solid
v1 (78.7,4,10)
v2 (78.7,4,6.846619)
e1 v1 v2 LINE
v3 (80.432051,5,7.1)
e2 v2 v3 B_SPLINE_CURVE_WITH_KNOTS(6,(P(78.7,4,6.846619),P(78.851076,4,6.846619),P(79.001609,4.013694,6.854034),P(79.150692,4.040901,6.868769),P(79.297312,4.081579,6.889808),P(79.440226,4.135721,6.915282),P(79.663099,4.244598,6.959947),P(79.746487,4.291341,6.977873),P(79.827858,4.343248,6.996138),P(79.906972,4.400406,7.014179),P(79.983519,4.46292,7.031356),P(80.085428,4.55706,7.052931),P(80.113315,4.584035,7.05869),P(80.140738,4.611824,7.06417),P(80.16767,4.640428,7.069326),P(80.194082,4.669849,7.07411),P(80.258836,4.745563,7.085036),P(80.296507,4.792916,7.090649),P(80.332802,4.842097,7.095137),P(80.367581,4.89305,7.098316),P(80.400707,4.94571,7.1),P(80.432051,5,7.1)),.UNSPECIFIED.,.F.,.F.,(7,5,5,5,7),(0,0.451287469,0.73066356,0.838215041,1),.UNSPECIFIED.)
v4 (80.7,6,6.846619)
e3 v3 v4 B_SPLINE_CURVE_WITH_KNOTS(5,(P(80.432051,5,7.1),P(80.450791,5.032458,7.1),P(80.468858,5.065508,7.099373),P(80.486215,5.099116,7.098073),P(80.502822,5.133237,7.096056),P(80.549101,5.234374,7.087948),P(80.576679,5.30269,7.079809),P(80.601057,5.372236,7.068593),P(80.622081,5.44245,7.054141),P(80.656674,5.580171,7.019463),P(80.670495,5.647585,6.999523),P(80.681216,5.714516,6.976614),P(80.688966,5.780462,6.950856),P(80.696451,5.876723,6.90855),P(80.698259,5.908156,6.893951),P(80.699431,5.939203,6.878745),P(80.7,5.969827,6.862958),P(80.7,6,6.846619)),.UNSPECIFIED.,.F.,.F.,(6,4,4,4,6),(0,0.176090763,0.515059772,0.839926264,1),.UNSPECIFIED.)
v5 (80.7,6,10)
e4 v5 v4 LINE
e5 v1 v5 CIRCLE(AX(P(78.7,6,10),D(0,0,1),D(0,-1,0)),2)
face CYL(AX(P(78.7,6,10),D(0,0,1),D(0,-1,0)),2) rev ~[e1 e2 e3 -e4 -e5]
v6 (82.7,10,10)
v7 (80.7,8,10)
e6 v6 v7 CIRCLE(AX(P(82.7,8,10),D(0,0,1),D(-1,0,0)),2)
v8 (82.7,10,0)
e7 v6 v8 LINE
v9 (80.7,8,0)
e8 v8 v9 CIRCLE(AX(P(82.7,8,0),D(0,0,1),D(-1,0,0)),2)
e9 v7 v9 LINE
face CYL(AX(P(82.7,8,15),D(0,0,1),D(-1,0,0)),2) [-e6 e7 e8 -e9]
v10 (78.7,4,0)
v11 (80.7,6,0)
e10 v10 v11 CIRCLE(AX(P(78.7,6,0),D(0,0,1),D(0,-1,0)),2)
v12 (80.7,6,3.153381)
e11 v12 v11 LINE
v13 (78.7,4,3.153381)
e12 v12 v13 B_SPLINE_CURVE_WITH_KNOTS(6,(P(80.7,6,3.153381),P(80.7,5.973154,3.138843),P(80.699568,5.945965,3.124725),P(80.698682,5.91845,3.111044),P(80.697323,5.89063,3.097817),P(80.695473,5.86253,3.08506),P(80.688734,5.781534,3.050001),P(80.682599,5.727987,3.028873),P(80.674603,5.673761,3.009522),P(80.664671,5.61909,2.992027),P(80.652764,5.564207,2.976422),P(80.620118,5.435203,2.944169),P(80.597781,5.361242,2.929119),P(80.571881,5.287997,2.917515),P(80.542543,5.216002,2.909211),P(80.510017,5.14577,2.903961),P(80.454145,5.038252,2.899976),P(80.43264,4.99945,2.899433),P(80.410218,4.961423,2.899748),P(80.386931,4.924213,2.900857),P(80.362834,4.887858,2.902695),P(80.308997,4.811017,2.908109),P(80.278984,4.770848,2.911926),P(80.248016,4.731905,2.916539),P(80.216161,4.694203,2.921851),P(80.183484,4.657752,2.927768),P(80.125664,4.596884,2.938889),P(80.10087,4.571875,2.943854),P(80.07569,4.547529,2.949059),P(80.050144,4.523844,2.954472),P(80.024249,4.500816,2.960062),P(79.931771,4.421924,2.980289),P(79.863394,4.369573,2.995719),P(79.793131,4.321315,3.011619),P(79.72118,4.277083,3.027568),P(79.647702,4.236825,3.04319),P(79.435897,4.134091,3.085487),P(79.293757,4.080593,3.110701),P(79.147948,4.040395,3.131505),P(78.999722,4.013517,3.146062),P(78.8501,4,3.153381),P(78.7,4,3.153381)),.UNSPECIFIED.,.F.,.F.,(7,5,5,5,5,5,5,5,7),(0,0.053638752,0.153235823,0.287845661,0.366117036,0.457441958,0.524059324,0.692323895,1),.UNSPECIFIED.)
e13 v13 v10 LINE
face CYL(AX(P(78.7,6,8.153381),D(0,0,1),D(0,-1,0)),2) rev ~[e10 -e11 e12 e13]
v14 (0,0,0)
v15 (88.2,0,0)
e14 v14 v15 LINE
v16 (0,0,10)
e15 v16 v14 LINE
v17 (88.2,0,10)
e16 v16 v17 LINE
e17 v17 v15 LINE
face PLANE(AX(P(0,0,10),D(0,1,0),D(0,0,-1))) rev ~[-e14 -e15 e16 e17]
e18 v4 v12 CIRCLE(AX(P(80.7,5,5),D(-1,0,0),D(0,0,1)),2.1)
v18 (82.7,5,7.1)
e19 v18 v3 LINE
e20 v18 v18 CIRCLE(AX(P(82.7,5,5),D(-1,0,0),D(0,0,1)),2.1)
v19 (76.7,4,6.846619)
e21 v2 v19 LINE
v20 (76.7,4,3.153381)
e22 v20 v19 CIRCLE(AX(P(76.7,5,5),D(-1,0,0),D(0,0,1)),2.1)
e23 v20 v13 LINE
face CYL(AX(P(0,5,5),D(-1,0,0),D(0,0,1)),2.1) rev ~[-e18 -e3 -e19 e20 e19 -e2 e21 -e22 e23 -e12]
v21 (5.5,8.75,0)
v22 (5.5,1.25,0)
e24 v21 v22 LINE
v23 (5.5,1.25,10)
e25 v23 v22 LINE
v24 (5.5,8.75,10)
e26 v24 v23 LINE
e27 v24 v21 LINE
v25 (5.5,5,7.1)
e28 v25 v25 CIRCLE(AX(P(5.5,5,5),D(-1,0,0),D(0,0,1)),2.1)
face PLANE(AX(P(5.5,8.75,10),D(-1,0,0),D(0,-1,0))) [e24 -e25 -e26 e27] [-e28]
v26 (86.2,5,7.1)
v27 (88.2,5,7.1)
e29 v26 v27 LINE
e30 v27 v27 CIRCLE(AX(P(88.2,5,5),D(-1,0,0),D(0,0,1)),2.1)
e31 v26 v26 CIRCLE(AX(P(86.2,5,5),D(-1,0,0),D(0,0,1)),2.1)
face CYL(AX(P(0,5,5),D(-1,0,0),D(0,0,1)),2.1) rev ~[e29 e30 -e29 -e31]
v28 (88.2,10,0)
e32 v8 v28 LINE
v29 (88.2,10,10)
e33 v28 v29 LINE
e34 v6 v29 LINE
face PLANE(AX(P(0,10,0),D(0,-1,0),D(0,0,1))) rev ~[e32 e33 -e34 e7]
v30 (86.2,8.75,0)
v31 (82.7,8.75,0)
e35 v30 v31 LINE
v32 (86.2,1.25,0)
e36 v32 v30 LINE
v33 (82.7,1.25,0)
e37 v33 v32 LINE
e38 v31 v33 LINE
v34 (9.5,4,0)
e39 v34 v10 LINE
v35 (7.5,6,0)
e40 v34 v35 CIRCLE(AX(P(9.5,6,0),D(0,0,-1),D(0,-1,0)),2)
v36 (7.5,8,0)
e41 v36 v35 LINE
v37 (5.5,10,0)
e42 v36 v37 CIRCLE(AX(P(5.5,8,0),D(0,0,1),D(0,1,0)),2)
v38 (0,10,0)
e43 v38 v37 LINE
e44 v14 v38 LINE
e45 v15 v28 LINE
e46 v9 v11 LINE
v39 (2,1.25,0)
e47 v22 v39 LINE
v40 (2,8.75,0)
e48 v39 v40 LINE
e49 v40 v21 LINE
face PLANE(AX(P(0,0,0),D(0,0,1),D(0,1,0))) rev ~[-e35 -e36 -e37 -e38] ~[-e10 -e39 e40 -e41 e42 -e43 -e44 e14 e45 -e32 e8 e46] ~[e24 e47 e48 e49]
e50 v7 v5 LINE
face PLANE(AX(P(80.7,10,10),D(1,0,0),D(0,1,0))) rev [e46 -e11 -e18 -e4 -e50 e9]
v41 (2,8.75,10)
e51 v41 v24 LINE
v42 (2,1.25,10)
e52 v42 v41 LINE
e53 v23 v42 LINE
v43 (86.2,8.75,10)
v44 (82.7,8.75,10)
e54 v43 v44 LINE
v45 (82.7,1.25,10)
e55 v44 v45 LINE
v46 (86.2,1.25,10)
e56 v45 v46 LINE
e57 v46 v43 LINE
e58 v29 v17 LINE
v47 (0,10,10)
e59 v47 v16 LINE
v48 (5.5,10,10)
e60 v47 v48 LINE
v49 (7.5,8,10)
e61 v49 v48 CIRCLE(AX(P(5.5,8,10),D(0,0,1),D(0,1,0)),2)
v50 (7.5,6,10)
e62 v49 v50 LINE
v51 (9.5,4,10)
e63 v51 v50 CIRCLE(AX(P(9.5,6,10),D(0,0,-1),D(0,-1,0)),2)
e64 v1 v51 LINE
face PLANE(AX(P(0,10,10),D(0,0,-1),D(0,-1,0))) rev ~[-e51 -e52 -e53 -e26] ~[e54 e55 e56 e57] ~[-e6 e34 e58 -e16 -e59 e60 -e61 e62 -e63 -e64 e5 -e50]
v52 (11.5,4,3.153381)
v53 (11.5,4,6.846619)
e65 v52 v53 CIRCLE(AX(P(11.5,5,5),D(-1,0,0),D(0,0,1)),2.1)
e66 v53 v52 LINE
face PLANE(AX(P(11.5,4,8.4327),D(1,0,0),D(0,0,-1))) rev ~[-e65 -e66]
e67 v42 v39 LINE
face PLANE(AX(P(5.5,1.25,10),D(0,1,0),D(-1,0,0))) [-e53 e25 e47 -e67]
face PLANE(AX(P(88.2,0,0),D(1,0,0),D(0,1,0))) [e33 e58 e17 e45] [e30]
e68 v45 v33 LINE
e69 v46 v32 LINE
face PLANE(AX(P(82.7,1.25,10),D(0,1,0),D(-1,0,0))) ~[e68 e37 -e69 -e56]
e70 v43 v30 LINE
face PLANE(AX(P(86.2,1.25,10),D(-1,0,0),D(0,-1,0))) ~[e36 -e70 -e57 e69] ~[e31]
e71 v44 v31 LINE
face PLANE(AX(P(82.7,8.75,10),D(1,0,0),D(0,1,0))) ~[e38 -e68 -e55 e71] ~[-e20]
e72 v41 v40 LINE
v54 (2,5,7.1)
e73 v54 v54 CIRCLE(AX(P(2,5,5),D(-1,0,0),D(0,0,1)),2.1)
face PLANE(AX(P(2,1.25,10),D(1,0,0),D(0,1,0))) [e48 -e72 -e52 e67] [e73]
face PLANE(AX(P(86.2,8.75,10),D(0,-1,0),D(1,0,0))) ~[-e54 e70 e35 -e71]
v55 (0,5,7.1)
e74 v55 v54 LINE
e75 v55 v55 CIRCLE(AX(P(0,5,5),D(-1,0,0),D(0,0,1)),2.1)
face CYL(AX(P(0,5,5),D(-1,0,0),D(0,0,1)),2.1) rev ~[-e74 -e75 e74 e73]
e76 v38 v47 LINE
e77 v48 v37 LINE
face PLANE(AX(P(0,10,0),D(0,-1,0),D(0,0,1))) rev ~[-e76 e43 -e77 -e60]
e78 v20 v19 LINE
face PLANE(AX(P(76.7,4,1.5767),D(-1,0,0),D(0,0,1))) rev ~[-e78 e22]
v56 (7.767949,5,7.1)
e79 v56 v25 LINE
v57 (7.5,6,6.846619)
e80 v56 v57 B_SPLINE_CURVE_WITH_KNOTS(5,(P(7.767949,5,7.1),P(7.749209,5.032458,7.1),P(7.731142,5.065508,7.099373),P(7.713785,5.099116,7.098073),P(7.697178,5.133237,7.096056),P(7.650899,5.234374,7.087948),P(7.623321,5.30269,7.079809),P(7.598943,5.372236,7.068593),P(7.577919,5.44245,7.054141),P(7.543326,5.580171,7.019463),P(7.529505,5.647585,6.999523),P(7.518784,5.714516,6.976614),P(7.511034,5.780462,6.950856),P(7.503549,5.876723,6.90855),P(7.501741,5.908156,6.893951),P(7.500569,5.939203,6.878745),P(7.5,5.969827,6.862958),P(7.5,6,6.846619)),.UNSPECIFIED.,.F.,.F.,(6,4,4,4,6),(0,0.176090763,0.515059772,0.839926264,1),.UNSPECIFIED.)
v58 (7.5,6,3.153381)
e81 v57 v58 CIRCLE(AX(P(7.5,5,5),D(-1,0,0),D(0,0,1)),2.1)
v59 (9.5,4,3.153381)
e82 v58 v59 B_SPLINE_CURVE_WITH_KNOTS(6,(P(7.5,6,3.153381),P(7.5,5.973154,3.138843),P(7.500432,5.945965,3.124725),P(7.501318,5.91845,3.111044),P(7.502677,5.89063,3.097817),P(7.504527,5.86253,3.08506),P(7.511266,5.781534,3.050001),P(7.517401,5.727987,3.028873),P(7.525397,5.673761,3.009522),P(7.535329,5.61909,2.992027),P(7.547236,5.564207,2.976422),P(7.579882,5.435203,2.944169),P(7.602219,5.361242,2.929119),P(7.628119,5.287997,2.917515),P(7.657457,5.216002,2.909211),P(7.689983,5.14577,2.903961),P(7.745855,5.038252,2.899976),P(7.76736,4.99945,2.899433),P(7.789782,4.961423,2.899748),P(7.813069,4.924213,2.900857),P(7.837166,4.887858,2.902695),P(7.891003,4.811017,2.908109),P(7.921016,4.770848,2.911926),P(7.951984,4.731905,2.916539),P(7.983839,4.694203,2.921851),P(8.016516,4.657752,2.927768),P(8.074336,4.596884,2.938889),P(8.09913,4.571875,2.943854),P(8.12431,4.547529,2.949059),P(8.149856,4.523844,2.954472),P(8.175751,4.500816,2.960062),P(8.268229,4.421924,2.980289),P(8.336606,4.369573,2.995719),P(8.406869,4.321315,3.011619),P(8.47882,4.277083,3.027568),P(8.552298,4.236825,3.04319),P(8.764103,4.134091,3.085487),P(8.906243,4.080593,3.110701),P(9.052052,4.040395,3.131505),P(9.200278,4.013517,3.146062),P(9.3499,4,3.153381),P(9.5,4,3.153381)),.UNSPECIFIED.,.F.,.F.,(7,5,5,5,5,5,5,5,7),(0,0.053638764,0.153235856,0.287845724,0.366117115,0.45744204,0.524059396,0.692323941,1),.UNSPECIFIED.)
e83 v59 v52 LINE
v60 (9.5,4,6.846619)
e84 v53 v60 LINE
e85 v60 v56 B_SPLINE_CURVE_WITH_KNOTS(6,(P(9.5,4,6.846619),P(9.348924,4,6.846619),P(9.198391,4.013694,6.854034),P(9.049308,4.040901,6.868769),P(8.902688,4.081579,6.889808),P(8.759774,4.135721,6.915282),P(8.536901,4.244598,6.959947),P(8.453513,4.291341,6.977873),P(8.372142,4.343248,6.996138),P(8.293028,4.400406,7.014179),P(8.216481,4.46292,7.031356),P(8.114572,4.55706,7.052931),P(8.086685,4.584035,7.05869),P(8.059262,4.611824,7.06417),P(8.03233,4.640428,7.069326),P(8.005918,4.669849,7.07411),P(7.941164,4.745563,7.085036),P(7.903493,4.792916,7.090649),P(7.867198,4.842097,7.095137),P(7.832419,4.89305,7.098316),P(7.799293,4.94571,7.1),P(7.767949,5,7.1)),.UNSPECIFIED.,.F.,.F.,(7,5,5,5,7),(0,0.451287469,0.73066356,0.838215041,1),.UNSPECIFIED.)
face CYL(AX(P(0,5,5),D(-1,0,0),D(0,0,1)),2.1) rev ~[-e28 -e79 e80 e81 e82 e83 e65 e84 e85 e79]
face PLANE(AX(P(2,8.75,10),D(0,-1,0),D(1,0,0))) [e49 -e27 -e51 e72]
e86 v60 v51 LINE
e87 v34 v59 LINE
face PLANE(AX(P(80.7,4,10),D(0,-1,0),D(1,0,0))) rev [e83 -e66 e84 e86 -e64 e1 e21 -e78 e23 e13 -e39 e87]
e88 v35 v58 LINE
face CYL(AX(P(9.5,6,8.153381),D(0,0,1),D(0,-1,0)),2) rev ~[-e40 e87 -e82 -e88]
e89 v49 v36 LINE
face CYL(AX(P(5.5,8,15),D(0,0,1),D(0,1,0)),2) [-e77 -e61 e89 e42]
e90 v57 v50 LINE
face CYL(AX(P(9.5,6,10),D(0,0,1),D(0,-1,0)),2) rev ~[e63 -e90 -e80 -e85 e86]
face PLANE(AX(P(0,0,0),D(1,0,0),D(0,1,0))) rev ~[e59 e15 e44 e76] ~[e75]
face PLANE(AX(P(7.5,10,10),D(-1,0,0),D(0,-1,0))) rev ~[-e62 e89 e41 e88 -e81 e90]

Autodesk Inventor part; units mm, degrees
ref_plane "YZ Plane" through (0, 0, 0) normal (1, 0, 0) x (0, 1, 0)
ref_plane "XZ Plane" through (0, 0, 0) normal (0, 1, 0) x (-1, 0, 0)
sketch "Sketch11" plane through (0, 0, 0) normal (1, 0, 0) x (0, 1, 0)
  line L0 (0, 0) -> (10, 0)
  line L1 (10, 0) -> (10, 10)
  line L2 (10, 10) -> (0, 10)
  line L3 (0, 10) -> (0, 0)
  dimension "d27" = 10
  dimension "d28" = 10
extrude "Extrusion8" add sketch "Sketch11" along normal blind 88.2
sketch "Sketch12" plane through (0, 0, 0) normal (-1, 0, 0) x (0, 0, 1)
  circle A0 centre (5, 5) radius 2.1
  dimension "d31" = 4.2
extrude "Extrusion9" cut sketch "Sketch12" against normal blind 88.2
sketch "Sketch13" plane through (0, 0, 10) normal (0, 0, 1) x (1, 0, 0)
  line L0 (0, 10) -> (0, 0) projected
  line L1 (0, 10) -> (88.2, 10) projected
  line L2 (10, 10) -> (78.2, 10)
  line L3 (78.2, 10) -> (78.2, 4)
  line L4 (78.2, 4) -> (10, 4)
  line L5 (10, 4) -> (10, 10)
  dimension "d34" = 68.2
  dimension "d35" = 6
  dimension "d36" = 10
extrude "Extrusion10" cut sketch "Sketch13" against normal blind 88.2
sketch "Sketch14" plane through (0, 0, 10) normal (0, 0, 1) x (1, 0, 0)
  line L0 (0, 10) -> (10, 10) projected
  line L1 (0, 10) -> (0, 0) projected
  line L2 (2, 8.75) -> (5.5, 8.75)
  line L3 (5.5, 8.75) -> (5.5, 1.25)
  line L4 (5.5, 1.25) -> (2, 1.25)
  line L5 (2, 1.25) -> (2, 8.75)
  line L6 (10, 10) -> (7.5, 10)
  line L7 (7.5, 10) -> (7.5, 4)
  line L8 (7.5, 4) -> (10, 4)
  line L9 (10, 4) -> (10, 10)
  dimension "d39" = 3.5
  dimension "d40" = 7.5
  dimension "d41" = 1.25
  dimension "d42" = 2
  dimension "d43" = 2
extrude "Extrusion11" cut sketch "Sketch14" against normal blind 88.2
ref_plane "Work Plane5" through (44.1, 0, 0) normal (1, 0, 0) x (0, 0, -1)
mirror "Mirror4" about plane through (44.1, 0, 0) normal (1, 0, 0) of "Extrusion11", "Extrusion10"
sketch "Sketch15" plane through (7.5, 4, 3.1534) normal (0, 1, 0) x (1, 0, 0)
  line L0 (0, 0) -> (0, 3.1534) projected
  line L1 (4, 1.5767) -> (69.2, 1.5767)
  line L2 (69.2, 1.5767) -> (69.2, -5.2793)
  line L3 (69.2, -5.2793) -> (4, -5.2793)
  line L4 (4, -5.2793) -> (4, 1.5767)
  point P0 (-7.5, 3.1534)
  dimension "d47" = 65.2
  dimension "d48" = 4
extrude "Extrusion12" add sketch "Sketch15" against normal blind 3
fillet "Fillet2" radius 2 6 edges at (80.7, 10, 5) (80.7, 4, 8.4233) (80.7, 4, 1.5767) (7.5, 4, 1.5767) (7.5, 4, 8.4233) (7.5, 10, 5)
properties part number "BaseSlat"
